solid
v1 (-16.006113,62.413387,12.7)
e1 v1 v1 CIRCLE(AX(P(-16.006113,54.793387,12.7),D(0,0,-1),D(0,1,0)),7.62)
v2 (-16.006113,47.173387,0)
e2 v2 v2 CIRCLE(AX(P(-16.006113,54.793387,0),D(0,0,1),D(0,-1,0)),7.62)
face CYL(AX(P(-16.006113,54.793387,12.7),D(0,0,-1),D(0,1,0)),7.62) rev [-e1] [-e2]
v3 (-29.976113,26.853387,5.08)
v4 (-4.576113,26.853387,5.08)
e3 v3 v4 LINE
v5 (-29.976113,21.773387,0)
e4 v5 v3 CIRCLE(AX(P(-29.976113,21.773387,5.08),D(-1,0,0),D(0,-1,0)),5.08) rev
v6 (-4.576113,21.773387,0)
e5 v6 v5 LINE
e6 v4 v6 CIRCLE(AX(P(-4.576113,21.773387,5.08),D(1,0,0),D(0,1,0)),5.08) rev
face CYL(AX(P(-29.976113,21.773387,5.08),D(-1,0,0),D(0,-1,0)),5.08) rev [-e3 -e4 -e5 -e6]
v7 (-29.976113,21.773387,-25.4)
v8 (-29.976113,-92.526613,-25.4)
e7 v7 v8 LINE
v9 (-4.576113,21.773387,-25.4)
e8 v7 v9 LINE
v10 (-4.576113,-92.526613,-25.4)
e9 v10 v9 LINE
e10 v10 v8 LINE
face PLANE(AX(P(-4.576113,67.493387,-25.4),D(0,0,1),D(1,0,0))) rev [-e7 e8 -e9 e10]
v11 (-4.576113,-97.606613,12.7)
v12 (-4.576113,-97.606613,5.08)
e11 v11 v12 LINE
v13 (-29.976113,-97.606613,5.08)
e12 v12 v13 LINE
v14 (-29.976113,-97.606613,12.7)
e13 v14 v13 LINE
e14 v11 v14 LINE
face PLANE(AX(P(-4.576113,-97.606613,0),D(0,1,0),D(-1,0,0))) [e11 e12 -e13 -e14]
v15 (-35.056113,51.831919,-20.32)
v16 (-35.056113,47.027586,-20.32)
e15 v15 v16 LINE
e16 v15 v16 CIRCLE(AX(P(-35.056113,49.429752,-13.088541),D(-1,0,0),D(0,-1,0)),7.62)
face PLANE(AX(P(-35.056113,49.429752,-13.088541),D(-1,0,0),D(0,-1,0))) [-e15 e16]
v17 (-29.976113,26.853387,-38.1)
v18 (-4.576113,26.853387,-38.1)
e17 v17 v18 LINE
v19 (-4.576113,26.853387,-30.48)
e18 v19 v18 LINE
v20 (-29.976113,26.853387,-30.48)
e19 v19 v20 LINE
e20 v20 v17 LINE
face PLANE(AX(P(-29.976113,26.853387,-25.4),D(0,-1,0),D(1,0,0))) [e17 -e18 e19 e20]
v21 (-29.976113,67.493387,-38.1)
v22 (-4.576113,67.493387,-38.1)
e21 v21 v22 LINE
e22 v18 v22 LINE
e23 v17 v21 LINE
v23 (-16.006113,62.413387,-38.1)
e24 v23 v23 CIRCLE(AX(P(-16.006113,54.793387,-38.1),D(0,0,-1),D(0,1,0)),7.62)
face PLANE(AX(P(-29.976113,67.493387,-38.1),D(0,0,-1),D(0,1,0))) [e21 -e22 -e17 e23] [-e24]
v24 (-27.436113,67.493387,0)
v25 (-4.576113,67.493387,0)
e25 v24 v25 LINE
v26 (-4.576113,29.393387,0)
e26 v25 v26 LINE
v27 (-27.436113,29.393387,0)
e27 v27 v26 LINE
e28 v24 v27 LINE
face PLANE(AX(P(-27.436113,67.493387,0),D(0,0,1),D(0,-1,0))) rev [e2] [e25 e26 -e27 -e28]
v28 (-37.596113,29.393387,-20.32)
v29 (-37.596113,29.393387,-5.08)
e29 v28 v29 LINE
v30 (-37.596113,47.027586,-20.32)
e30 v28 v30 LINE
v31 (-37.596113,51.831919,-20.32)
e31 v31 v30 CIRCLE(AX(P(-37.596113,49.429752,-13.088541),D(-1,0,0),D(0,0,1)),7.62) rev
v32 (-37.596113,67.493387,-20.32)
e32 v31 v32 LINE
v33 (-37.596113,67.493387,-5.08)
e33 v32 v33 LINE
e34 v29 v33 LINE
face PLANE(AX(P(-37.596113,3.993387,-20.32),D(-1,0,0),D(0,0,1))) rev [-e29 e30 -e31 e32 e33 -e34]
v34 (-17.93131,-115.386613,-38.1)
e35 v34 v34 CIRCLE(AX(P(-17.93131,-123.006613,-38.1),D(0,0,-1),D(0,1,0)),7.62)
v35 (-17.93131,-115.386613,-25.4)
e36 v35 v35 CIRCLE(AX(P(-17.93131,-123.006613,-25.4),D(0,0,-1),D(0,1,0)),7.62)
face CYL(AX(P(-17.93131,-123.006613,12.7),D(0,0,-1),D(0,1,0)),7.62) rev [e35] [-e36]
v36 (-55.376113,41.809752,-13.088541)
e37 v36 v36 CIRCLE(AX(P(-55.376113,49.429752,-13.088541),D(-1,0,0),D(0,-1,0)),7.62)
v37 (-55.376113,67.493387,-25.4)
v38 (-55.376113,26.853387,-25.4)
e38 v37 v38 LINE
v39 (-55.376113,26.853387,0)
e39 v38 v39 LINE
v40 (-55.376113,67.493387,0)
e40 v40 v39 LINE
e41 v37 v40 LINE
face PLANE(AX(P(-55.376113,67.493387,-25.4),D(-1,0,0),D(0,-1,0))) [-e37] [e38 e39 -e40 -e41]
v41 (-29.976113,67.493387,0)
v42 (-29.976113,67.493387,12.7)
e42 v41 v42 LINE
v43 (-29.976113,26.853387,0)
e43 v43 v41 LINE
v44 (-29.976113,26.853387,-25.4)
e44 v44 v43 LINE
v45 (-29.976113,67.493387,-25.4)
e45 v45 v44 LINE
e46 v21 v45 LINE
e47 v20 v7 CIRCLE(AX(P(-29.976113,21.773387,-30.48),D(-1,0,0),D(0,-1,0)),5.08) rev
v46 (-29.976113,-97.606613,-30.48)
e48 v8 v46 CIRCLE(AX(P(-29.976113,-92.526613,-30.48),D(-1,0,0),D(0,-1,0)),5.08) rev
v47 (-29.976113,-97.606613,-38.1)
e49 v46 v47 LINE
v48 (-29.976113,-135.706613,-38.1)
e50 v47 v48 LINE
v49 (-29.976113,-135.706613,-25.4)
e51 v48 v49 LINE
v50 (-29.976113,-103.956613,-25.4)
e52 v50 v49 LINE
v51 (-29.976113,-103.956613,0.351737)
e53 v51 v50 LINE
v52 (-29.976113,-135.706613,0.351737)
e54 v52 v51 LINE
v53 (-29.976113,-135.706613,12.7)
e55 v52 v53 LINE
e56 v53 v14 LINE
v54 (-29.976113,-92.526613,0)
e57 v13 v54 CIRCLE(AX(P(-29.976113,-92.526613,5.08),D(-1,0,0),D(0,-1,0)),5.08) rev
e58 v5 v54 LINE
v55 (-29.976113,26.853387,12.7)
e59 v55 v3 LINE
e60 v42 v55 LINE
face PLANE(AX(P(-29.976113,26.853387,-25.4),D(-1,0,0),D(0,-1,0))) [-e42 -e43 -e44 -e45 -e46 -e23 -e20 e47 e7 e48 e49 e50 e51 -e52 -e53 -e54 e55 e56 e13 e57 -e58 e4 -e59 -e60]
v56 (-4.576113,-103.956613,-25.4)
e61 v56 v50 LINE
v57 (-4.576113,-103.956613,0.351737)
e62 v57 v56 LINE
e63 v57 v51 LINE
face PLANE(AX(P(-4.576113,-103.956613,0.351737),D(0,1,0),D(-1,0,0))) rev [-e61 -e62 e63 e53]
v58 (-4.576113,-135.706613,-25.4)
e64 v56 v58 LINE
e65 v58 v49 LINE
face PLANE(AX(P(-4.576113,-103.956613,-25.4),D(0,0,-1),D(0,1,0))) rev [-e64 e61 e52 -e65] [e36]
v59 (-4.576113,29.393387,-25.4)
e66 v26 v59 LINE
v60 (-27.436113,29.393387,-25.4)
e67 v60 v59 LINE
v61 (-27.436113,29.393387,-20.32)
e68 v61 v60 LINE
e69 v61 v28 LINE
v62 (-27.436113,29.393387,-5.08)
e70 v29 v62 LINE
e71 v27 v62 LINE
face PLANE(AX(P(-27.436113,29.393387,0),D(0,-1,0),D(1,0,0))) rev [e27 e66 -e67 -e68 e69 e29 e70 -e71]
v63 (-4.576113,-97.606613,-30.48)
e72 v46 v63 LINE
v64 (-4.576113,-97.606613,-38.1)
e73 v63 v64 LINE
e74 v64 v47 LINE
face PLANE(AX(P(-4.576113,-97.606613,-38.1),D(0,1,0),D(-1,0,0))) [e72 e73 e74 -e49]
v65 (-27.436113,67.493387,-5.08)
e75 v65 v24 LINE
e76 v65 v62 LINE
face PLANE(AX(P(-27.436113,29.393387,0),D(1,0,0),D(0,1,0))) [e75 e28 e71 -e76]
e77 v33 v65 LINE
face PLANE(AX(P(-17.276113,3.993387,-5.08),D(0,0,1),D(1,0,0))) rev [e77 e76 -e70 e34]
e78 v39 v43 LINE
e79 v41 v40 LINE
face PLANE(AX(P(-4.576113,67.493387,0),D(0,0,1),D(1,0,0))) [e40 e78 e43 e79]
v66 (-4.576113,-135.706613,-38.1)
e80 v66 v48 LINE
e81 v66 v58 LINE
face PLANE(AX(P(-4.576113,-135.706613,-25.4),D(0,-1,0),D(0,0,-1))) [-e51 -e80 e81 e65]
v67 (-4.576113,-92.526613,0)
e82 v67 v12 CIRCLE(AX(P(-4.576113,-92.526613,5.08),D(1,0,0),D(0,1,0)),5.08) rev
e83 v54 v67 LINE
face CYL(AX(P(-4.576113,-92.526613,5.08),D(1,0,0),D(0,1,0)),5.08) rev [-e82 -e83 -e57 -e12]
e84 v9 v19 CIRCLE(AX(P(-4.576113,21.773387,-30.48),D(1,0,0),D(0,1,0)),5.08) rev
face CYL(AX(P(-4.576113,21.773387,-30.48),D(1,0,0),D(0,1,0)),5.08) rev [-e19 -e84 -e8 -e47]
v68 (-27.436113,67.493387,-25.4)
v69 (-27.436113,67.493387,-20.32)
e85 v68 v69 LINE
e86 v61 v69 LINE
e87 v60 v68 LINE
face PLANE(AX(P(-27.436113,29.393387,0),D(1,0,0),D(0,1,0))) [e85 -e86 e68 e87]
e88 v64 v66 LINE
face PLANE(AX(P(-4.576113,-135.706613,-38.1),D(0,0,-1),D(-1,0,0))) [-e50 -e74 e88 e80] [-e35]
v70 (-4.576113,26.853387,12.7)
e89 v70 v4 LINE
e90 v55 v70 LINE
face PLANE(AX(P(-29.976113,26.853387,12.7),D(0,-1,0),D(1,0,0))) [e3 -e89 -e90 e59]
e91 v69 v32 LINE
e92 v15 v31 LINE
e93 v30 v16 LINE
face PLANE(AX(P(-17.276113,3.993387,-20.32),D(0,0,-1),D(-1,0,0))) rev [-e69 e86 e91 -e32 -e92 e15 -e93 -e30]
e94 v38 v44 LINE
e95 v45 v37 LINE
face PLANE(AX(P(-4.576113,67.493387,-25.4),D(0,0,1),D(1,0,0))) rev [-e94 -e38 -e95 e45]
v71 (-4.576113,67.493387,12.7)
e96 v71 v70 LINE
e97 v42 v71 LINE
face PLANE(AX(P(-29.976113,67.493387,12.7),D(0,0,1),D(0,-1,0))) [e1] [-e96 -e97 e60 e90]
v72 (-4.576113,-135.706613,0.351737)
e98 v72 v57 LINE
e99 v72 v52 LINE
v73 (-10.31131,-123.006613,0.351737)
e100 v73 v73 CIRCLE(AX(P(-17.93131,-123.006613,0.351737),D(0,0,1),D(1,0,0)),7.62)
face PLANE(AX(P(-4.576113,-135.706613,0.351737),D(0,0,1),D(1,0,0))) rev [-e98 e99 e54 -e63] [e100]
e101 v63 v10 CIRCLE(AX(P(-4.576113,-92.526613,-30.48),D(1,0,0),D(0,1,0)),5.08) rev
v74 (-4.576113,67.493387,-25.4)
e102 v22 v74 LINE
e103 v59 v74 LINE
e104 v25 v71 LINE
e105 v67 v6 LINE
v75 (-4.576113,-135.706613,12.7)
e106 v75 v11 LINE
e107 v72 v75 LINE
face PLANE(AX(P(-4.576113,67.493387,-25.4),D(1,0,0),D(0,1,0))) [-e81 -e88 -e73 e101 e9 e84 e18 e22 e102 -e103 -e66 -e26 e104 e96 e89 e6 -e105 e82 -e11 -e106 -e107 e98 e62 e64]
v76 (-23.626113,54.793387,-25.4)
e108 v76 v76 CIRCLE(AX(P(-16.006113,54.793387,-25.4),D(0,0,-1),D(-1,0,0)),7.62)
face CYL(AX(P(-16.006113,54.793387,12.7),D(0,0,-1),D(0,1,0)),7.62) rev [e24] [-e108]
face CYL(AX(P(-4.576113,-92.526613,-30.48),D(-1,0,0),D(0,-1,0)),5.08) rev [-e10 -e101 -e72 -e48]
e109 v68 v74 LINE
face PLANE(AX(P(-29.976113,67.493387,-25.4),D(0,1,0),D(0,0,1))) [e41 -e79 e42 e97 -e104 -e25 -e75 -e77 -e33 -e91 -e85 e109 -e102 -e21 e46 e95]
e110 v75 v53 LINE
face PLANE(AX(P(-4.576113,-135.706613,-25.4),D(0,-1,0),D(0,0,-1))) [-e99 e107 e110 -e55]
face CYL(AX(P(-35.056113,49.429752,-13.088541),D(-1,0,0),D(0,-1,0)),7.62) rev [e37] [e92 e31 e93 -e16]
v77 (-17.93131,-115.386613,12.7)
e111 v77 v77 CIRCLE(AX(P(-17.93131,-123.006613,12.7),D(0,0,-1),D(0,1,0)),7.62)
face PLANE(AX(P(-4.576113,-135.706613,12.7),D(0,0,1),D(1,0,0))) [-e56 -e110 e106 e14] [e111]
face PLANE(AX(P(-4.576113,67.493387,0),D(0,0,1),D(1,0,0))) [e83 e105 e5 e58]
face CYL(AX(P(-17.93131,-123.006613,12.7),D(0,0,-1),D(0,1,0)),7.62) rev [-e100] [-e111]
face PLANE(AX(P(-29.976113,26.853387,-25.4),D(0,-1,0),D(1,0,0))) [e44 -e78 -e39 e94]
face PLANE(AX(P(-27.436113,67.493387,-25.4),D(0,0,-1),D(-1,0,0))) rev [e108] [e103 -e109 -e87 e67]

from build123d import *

# Parameters (mm, degrees)
BASE_EXTRUDE_DEPTH  = 25.4
SKETCH7_W           = 12.7
SKETCH7_H           = 38.1
BOSS_EXTRUDE5_DEPTH = 25.4
SKETCH8_W           = 25.751736715
SKETCH8_H           = 31.75
CUT_EXTRUDE5_DEPTH  = 25.4
SKETCH11_W          = 12.7
SKETCH11_H          = 40.64
BOSS_EXTRUDE6_DEPTH = 25.4
SKETCH12_W          = 25.4
SKETCH12_H          = 38.1
CUT_EXTRUDE7_DEPTH  = 22.86
SKETCH13_R          = 7.62
CUT_EXTRUDE8_DEPTH  = 20.32
CUT_EXTRUDE9_START  = -50.8
SKETCH14_R          = 7.62
CUT_EXTRUDE9_DEPTH  = 50.8
CUT_EXTRUDE10_REACH = 216.029
SKETCH15_W          = 20.32
SKETCH15_H          = 15.24
FILLET1_R           = 5.08


with BuildPart() as part:
    # Sketch1 → Base-Extrude (new body)
    with BuildSketch(Plane.XY):
        Polygon((-4.57611336, -135.706612686), (-29.97611336, -135.706612686), (-29.97611336, 26.853387314), (-55.37611336, 26.853387314), (-55.37611336, 67.493387314), (-29.97611336, 67.493387314), (-4.57611336, 67.493387314), align=None)
    extrude(amount=-BASE_EXTRUDE_DEPTH)

    # Sketch7 → Boss-Extrude5 (add)
    with BuildSketch(Plane.ZY.offset(29.97611336)):
        with Locations((-31.75, -116.656612686)):
            Rectangle(SKETCH7_W, SKETCH7_H)
        with Locations((6.35, -116.656612686)):
            Rectangle(SKETCH7_W, SKETCH7_H)
    extrude(amount=-BOSS_EXTRUDE5_DEPTH)

    # Sketch8 → Cut-Extrude5 (cut)
    with BuildSketch(Plane.ZY.offset(29.97611336)):
        with Locations((-12.524131643, -119.831612686)):
            Rectangle(SKETCH8_W, SKETCH8_H)
    extrude(amount=-CUT_EXTRUDE5_DEPTH, mode=Mode.SUBTRACT)

    # Sketch11 → Boss-Extrude6 (add)
    with BuildSketch(Plane(origin=(-4.57611336, 0, 0), x_dir=(0, 0, -1), z_dir=(1, 0, 0))):
        with Locations((31.75, 47.173387314)):
            Rectangle(SKETCH11_W, SKETCH11_H)
        with Locations((-6.35, 47.173387314)):
            Rectangle(SKETCH11_W, SKETCH11_H)
    extrude(amount=-BOSS_EXTRUDE6_DEPTH)

    # Sketch12 → Cut-Extrude7 (cut)
    with BuildSketch(Plane(origin=(-4.57611336, 0, 0), x_dir=(0, 0, -1), z_dir=(1, 0, 0))):
        with Locations((12.7, 48.443387314)):
            Rectangle(SKETCH12_W, SKETCH12_H)
    extrude(amount=-CUT_EXTRUDE7_DEPTH, mode=Mode.SUBTRACT)

    # Sketch13 → Cut-Extrude8 (cut)
    with BuildSketch(Plane.ZY.offset(55.37611336)):
        with Locations(Location((-13.088541232, 49.429752215, 0), (0, 0, 270))):
            Circle(SKETCH13_R)
    extrude(amount=-CUT_EXTRUDE8_DEPTH, mode=Mode.SUBTRACT)

    # Sketch14 → Cut-Extrude9 (cut)
    with BuildSketch(Plane(origin=(0, 0, -38.1), x_dir=(-1, 0, 0), z_dir=(0, 0, -1)).offset(CUT_EXTRUDE9_START)):
        with Locations(Location((16.00611336, 54.793387314, 0), (0, 0, 90))):
            Circle(SKETCH14_R)
        with Locations(Location((17.931310165, -123.006612686, 0), (0, 0, 90))):
            Circle(SKETCH14_R)
    extrude(amount=CUT_EXTRUDE9_DEPTH, mode=Mode.SUBTRACT)

    # Cut-Extrude10: up to this face of the body (flat: up to its plane)
    cut_extrude10_end = Plane(part.part.faces().sort_by_distance((-16.00611336, 29.393387314, -12.7))[0])
    # Sketch15 → Cut-Extrude10 (cut, up to the picked face)
    with BuildSketch(Plane(origin=(0, 67.493387314, 0), x_dir=(1, 0, 0), z_dir=(0, 1, 0)), mode=Mode.PRIVATE) as cut_extrude10_sk1:
        with Locations((-27.43611336, 12.7)):
            Rectangle(SKETCH15_W, SKETCH15_H)
    cut_extrude10_tool1 = split(extrude(cut_extrude10_sk1.sketch, amount=-CUT_EXTRUDE10_REACH, mode=Mode.PRIVATE), bisect_by=cut_extrude10_end, keep=Keep.BOTH, mode=Mode.PRIVATE)
    add(cut_extrude10_tool1.solids().sort_by(Axis((-27.436113, 67.493387, -12.7), (0, -1, 0)))[0], mode=Mode.SUBTRACT)

    # Fillet1
    # the kernel refuses this fillet: 5.08 mm, written as the material it adds along each edge
    with BuildSketch(Plane(origin=(-29.97611336, -97.606612686, 0), x_dir=(0, 1, 0), z_dir=(1, 0, 0)), Plane(origin=(-29.97611336, -97.606612686, -25.4), x_dir=(0, 0, -1), z_dir=(1, 0, 0)), Plane(origin=(-4.57611336, 26.853387314, 0), x_dir=(0, -1, 0), z_dir=(-1, 0, 0))) as fillet1_piece_1:
        with BuildLine():
            CenterArc((FILLET1_R, FILLET1_R), FILLET1_R, 180, 90)
            Line((0, FILLET1_R), (0, 0))
            Line((0, 0), (FILLET1_R, 0))
        make_face()
    extrude(amount=25.4)
    with BuildSketch(Plane(origin=(-4.57611336, 26.853387314, -25.4), x_dir=(0, -1, 0), z_dir=(-1, 0, 0))) as fillet1_piece_2:
        with BuildLine():
            CenterArc((FILLET1_R, -FILLET1_R), FILLET1_R, 90, 90)
            Line((0, -FILLET1_R), (0, 0))
            Line((0, 0), (FILLET1_R, 0))
        make_face()
    extrude(amount=25.4)


solid = part.part
